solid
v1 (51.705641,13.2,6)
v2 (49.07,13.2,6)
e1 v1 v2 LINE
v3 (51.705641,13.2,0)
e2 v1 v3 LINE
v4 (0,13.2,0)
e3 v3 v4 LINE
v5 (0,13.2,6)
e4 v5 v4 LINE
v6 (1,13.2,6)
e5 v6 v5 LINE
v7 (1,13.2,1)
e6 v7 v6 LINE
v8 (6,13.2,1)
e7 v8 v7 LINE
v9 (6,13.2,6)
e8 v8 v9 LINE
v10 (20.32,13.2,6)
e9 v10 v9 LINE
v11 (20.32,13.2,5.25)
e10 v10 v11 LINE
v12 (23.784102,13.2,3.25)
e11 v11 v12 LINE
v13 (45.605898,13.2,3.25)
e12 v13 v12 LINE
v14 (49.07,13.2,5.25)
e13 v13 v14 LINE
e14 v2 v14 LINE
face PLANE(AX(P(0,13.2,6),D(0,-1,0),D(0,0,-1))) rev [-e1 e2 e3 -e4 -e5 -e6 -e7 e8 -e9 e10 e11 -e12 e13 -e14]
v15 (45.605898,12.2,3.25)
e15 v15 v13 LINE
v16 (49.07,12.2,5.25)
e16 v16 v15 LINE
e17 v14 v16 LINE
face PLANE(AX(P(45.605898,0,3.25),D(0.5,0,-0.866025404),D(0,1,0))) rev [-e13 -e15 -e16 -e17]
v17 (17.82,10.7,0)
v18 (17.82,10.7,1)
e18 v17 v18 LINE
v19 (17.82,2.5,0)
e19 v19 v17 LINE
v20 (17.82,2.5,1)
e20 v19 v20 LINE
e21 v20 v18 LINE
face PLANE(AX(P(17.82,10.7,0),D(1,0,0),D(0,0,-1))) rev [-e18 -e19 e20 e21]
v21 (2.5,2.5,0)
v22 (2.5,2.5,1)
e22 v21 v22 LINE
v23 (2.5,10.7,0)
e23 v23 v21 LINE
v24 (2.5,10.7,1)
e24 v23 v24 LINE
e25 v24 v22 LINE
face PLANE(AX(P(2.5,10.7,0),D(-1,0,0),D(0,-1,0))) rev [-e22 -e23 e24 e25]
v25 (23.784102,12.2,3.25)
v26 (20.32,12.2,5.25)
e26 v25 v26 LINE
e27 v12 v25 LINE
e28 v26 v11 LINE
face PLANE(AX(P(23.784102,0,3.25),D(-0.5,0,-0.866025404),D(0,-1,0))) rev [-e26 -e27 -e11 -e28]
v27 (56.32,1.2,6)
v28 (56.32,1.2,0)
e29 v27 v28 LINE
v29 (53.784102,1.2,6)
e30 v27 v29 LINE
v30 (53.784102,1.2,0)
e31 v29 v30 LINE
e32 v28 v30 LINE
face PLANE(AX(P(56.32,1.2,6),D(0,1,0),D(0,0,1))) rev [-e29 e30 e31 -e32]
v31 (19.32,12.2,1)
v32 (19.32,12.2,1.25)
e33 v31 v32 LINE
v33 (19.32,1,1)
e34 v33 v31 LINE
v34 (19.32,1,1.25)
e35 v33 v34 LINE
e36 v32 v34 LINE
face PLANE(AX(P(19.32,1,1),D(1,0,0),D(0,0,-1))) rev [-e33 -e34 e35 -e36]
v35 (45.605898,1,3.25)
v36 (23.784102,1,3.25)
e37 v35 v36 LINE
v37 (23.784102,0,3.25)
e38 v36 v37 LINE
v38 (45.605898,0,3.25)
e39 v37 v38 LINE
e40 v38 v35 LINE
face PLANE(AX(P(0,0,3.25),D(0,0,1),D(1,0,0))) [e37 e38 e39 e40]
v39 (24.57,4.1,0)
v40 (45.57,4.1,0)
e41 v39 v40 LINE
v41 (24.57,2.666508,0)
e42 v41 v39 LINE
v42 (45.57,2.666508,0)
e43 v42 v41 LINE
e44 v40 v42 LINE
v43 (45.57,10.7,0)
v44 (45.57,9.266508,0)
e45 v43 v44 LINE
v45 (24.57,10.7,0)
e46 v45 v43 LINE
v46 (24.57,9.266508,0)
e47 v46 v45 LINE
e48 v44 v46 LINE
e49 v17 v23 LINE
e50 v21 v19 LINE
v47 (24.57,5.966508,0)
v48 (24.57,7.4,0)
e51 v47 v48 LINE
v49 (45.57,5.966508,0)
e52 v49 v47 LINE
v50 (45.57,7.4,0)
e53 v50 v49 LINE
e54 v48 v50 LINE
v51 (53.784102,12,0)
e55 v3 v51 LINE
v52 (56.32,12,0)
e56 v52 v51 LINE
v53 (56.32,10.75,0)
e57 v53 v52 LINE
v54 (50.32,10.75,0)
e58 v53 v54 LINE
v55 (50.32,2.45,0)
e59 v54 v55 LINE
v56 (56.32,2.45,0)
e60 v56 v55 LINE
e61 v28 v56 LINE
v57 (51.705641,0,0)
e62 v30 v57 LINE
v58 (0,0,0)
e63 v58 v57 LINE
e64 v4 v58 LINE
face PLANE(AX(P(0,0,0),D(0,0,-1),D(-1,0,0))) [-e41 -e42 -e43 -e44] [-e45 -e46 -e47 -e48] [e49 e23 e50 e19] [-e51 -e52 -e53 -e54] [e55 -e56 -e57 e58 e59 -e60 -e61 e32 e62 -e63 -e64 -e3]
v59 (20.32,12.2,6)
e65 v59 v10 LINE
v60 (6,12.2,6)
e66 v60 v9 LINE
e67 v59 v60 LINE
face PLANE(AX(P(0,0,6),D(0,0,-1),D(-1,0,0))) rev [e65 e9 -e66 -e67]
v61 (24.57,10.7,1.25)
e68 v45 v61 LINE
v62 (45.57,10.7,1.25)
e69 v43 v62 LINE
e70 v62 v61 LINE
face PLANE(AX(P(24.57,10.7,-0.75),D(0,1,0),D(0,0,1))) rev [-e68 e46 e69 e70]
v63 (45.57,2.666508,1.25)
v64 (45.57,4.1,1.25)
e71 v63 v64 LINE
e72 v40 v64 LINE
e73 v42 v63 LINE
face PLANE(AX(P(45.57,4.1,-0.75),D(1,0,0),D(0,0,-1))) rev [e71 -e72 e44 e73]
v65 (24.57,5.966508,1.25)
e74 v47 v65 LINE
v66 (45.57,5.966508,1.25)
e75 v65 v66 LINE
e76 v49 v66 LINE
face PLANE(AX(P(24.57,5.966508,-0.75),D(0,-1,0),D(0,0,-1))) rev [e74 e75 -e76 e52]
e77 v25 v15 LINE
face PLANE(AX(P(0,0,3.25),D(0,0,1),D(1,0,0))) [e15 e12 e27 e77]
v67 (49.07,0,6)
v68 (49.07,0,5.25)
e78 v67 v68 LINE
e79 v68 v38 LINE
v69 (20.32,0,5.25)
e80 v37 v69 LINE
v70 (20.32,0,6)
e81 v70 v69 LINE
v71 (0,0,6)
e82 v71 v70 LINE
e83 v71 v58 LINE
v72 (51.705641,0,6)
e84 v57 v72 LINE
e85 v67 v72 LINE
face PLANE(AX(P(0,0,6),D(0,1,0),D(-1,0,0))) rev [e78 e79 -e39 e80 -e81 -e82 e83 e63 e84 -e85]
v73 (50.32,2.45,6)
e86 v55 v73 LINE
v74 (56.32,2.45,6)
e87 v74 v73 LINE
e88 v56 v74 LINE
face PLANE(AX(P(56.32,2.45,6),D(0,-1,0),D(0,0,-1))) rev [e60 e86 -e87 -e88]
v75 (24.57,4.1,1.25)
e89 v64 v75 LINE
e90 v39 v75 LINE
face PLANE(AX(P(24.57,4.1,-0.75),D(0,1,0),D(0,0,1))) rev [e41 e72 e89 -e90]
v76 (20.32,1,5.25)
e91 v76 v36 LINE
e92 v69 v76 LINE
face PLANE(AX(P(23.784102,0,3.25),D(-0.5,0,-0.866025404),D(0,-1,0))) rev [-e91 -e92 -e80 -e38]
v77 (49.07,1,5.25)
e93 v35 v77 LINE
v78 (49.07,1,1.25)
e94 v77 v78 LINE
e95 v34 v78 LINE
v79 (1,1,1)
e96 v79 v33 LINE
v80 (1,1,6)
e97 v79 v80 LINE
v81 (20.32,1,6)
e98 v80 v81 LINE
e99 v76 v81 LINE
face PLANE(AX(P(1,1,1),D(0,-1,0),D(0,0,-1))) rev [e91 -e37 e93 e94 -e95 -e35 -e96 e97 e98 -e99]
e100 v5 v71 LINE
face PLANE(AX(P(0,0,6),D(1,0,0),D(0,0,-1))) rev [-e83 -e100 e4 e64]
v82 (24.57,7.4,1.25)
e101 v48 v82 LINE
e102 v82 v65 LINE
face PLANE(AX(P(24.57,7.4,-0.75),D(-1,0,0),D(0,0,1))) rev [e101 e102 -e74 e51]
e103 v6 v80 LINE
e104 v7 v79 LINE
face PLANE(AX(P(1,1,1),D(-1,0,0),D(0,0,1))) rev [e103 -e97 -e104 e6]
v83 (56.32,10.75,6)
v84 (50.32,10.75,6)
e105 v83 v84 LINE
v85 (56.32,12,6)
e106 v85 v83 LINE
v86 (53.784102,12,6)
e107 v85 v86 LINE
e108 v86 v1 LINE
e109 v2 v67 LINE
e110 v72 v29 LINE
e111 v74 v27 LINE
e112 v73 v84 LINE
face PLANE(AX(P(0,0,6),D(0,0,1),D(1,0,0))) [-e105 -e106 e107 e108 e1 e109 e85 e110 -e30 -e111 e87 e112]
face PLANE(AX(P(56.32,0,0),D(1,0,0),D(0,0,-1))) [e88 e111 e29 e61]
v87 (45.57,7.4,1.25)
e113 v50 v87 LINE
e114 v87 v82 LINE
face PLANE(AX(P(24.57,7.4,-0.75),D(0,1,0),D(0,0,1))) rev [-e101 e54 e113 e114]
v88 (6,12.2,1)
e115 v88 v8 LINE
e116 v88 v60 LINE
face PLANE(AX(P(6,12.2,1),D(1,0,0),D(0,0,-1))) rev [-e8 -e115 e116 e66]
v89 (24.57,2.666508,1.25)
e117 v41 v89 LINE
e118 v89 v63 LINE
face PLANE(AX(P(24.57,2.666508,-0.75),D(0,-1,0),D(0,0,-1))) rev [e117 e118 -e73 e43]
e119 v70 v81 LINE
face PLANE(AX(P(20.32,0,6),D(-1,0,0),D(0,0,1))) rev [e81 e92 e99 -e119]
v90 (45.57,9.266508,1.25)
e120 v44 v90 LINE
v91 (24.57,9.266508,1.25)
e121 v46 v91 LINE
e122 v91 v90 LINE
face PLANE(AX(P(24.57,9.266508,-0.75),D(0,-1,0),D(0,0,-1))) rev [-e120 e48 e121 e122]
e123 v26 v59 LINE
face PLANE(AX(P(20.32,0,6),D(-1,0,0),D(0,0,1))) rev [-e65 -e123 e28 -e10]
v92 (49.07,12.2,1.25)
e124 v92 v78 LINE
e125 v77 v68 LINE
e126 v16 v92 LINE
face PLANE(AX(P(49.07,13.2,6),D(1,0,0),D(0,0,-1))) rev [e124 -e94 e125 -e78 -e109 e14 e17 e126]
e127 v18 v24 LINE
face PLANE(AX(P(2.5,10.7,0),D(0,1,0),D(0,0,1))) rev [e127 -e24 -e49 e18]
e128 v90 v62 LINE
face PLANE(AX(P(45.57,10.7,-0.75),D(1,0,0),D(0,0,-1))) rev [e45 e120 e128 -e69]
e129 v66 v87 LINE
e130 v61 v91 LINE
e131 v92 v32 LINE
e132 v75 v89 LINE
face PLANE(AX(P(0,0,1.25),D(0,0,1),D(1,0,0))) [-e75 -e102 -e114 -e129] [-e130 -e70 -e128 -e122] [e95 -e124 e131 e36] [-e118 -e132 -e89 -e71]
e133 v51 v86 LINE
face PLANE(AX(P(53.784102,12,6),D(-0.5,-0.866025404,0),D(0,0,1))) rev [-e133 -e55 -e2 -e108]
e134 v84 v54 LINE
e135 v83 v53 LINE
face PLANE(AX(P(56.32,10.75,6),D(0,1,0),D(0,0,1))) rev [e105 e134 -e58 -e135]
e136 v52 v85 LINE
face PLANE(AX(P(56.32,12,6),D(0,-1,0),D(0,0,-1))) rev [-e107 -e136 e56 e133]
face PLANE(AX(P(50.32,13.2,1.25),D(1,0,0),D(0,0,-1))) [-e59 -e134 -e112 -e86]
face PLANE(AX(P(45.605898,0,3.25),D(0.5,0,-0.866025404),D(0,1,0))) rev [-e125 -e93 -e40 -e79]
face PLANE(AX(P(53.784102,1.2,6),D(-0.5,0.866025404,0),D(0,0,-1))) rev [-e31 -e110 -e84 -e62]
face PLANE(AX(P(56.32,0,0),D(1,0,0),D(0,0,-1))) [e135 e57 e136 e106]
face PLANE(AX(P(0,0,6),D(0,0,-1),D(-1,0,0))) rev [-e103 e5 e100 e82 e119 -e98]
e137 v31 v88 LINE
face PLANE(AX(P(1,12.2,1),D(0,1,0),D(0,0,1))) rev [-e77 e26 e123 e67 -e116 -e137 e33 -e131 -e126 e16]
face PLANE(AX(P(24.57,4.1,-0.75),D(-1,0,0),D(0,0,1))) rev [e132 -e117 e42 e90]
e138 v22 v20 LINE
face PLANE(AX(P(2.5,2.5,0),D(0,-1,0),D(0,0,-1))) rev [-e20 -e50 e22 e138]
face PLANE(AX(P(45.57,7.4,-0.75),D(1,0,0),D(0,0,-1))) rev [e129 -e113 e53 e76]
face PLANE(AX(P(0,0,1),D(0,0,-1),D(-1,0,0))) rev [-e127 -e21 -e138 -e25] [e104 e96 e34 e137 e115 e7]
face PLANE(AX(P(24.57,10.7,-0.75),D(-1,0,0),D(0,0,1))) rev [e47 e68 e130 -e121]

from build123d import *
from OCP.BRepFilletAPI import BRepFilletAPI_MakeChamfer

# Parameters (mm, degrees)
ESQUISSE1_W             = 20.32
ESQUISSE1_H             = 13.2
BOSS_EXTRU_1_DEPTH      = 6
ESQUISSE2_W             = 18.32
ESQUISSE2_H             = 11.2
ENL_V_MAT_EXTRU_1_DEPTH = 5
ESQUISSE3_W             = 5
ESQUISSE3_H             = 1
ENL_V_MAT_EXTRU_2_DEPTH = 5
ESQUISSE4_W             = 15.32
ESQUISSE4_H             = 8.2
ENL_V_MAT_EXTRU_3_DEPTH = 25.741511676
ESQUISSE6_W             = 1
ESQUISSE6_H             = 11.2
ENL_V_MAT_EXTRU_4_DEPTH = 4.75
ESQUISSE7_W             = 30
ESQUISSE7_H             = 13.2
BOSS_EXTRU_2_DEPTH      = 1.25
ESQUISSE8_W             = 1.25
ESQUISSE8_H             = 13.2
BOSS_EXTRU_3_DEPTH      = 4.75
ESQUISSE9_W             = 6
ESQUISSE9_H             = 1.25
BOSS_EXTRU_4_DEPTH      = 6
CHANFREIN1_SIZE         = 2
CHANFREIN1_SIZE_2       = 3.464101615
ESQUISSE10_W            = 28.75
ESQUISSE10_H            = 1
BOSS_EXTRU_5_DEPTH      = 2
CHANFREIN2_SIZE         = 2
CHANFREIN2_SIZE2        = 3.464101615
ESQUISSE11_W            = 21
ESQUISSE11_H            = 1.433492253
ENL_V_MAT_EXTRU_5_DEPTH = 2


with BuildPart() as part:
    # Esquisse1 → Boss.-Extru.1 (new body)
    with BuildSketch(Plane.XY):
        with Locations((10.16, 6.6)):
            Rectangle(ESQUISSE1_W, ESQUISSE1_H)
    extrude(amount=BOSS_EXTRU_1_DEPTH)

    # Esquisse2 → Enlèv. mat.-Extru.1 (cut)
    with BuildSketch(Plane.XY.offset(6)):
        with Locations((10.16, 6.6)):
            Rectangle(ESQUISSE2_W, ESQUISSE2_H)
    extrude(amount=-ENL_V_MAT_EXTRU_1_DEPTH, mode=Mode.SUBTRACT)

    # Esquisse3 → Enlèv. mat.-Extru.2 (cut)
    with BuildSketch(Plane.XY.offset(6)):
        with Locations((3.5, 12.7)):
            Rectangle(ESQUISSE3_W, ESQUISSE3_H)
    extrude(amount=-ENL_V_MAT_EXTRU_2_DEPTH, mode=Mode.SUBTRACT)

    # Esquisse4 → Enlèv. mat.-Extru.3 (cut, through all)
    with BuildSketch(Plane.XY.offset(1)):
        with Locations((10.16, 6.6)):
            Rectangle(ESQUISSE4_W, ESQUISSE4_H)
    extrude(amount=-ENL_V_MAT_EXTRU_3_DEPTH, mode=Mode.SUBTRACT)

    # Esquisse6 → Enlèv. mat.-Extru.4 (cut)
    with BuildSketch(Plane.XY.offset(6)):
        with Locations((19.82, 6.6)):
            Rectangle(ESQUISSE6_W, ESQUISSE6_H)
    extrude(amount=-ENL_V_MAT_EXTRU_4_DEPTH, mode=Mode.SUBTRACT)

    # Esquisse7 → Boss.-Extru.2 (add)
    with BuildSketch(Plane(origin=(0, 0, 0), x_dir=(-1, 0, 0), z_dir=(0, 0, -1))):
        with Locations((-35.32, 6.6)):
            Rectangle(ESQUISSE7_W, ESQUISSE7_H)
    extrude(amount=-BOSS_EXTRU_2_DEPTH)

    # Esquisse8 → Boss.-Extru.3 (add)
    with BuildSketch(Plane.XY.offset(1.25)):
        with Locations((49.695, 6.6)):
            Rectangle(ESQUISSE8_W, ESQUISSE8_H)
    extrude(amount=BOSS_EXTRU_3_DEPTH)

    # Esquisse9 → Boss.-Extru.4 (add)
    with BuildSketch(Plane(origin=(50.32, 0, 0), x_dir=(0, 0, -1), z_dir=(1, 0, 0))):
        with Locations((-3, 11.375)):
            Rectangle(ESQUISSE9_W, ESQUISSE9_H)
        with Locations((-3, 1.825)):
            Rectangle(ESQUISSE9_W, ESQUISSE9_H)
    extrude(amount=BOSS_EXTRU_4_DEPTH)

    # Chanfrein1
    # the kernel refuses this chamfer: 3.464101615, 2 mm, written as the material it adds along each edge
    with BuildSketch(Plane(origin=(50.32, 12, 6), x_dir=(-0.057893862402669756, 0.9983227437537926, 0), z_dir=(0, 0, -1))) as chanfrein1_piece_1_section:
        Polygon((CHANFREIN1_SIZE * 0.998322743754, CHANFREIN1_SIZE * 0.0578938624027), (-CHANFREIN1_SIZE_2 * 0.057893862405, CHANFREIN1_SIZE_2 * 0.998322743793), (0, 0), align=None)
    chanfrein1_piece_1 = extrude(amount=6, mode=Mode.PRIVATE)
    chanfrein1_piece_1 = split(chanfrein1_piece_1, bisect_by=Plane(origin=(51.640549775, 13.2, 3), z_dir=(0, -1, 0)), keep=Keep.TOP, mode=Mode.PRIVATE)
    add(chanfrein1_piece_1)
    with BuildSketch(Plane(origin=(50.32, 1.2, 0), x_dir=(-0.05789386240266974, -0.9983227437537926, 0), z_dir=(0, 0, 1))) as chanfrein1_piece_2_section:
        Polygon((CHANFREIN1_SIZE * 0.998322743754, CHANFREIN1_SIZE * 0.0578938624027), (-CHANFREIN1_SIZE_2 * 0.057893862405, CHANFREIN1_SIZE_2 * 0.998322743793), (0, 0), align=None)
    chanfrein1_piece_2 = extrude(amount=6, mode=Mode.PRIVATE)
    chanfrein1_piece_2 = split(chanfrein1_piece_2, bisect_by=Plane(origin=(51.640549775, 0, 3), z_dir=(0, 1, 0)), keep=Keep.TOP, mode=Mode.PRIVATE)
    add(chanfrein1_piece_2)

    # Esquisse10 → Boss.-Extru.5 (add)
    with BuildSketch(Plane.XY.offset(1.25)):
        with Locations((34.695, 12.7)):
            Rectangle(ESQUISSE10_W, ESQUISSE10_H)
        with Locations((34.695, 0.5)):
            Rectangle(ESQUISSE10_W, ESQUISSE10_H)
    extrude(amount=BOSS_EXTRU_5_DEPTH)

    # Chanfrein2: one chamfer whose edges measure the first distance from different faces: ONE call of the kernel's chamfer builder (chamfer() names one face for all edges)
    chanfrein2_edges_1 = [part.edges().sort_by_distance(p)[0] for p in [
        (20.32, 12.7, 3.25),
    ]]
    chanfrein2_side_1 = [part.faces().sort_by_distance(p)[0] for p in [
        (20.32, 12.7, 4.625),
    ]]
    chanfrein2_edges_2 = [part.edges().sort_by_distance(p)[0] for p in [
        (49.07, 12.7, 3.25),
        (49.07, 0.5, 3.25),
    ]]
    chanfrein2_side_2 = [part.faces().sort_by_distance(p)[0] for p in [
        (49.07, 6.6, 3.718696763),
    ]]
    chanfrein2_edges_3 = [part.edges().sort_by_distance(p)[0] for p in [
        (20.32, 0.5, 3.25),
    ]]
    chanfrein2_side_3 = [part.faces().sort_by_distance(p)[0] for p in [
        (20.32, 0.5, 4.625),
    ]]
    chanfrein2 = BRepFilletAPI_MakeChamfer(part.part.solid().wrapped)
    for e in chanfrein2_edges_1:
        chanfrein2.Add(CHANFREIN2_SIZE, CHANFREIN2_SIZE2, e.wrapped, chanfrein2_side_1[0].wrapped)  # the first distance lies on this face
    for e in chanfrein2_edges_2:
        chanfrein2.Add(CHANFREIN2_SIZE, CHANFREIN2_SIZE2, e.wrapped, chanfrein2_side_2[0].wrapped)  # the first distance lies on this face
    for e in chanfrein2_edges_3:
        chanfrein2.Add(CHANFREIN2_SIZE, CHANFREIN2_SIZE2, e.wrapped, chanfrein2_side_3[0].wrapped)  # the first distance lies on this face
    add(Compound.cast(chanfrein2.Shape()), mode=Mode.REPLACE)

    # Esquisse11 → Enlèv. mat.-Extru.5 (cut)
    with BuildSketch(Plane.XY.offset(1.25)):
        with Locations((35.07, 9.983253874)):
            Rectangle(ESQUISSE11_W, ESQUISSE11_H)
        with Locations((35.07, 6.683253873)):
            Rectangle(ESQUISSE11_W, ESQUISSE11_H)
        with Locations((35.07, 3.383253874)):
            Rectangle(ESQUISSE11_W, ESQUISSE11_H)
    extrude(amount=-ENL_V_MAT_EXTRU_5_DEPTH, mode=Mode.SUBTRACT)


solid = part.part
